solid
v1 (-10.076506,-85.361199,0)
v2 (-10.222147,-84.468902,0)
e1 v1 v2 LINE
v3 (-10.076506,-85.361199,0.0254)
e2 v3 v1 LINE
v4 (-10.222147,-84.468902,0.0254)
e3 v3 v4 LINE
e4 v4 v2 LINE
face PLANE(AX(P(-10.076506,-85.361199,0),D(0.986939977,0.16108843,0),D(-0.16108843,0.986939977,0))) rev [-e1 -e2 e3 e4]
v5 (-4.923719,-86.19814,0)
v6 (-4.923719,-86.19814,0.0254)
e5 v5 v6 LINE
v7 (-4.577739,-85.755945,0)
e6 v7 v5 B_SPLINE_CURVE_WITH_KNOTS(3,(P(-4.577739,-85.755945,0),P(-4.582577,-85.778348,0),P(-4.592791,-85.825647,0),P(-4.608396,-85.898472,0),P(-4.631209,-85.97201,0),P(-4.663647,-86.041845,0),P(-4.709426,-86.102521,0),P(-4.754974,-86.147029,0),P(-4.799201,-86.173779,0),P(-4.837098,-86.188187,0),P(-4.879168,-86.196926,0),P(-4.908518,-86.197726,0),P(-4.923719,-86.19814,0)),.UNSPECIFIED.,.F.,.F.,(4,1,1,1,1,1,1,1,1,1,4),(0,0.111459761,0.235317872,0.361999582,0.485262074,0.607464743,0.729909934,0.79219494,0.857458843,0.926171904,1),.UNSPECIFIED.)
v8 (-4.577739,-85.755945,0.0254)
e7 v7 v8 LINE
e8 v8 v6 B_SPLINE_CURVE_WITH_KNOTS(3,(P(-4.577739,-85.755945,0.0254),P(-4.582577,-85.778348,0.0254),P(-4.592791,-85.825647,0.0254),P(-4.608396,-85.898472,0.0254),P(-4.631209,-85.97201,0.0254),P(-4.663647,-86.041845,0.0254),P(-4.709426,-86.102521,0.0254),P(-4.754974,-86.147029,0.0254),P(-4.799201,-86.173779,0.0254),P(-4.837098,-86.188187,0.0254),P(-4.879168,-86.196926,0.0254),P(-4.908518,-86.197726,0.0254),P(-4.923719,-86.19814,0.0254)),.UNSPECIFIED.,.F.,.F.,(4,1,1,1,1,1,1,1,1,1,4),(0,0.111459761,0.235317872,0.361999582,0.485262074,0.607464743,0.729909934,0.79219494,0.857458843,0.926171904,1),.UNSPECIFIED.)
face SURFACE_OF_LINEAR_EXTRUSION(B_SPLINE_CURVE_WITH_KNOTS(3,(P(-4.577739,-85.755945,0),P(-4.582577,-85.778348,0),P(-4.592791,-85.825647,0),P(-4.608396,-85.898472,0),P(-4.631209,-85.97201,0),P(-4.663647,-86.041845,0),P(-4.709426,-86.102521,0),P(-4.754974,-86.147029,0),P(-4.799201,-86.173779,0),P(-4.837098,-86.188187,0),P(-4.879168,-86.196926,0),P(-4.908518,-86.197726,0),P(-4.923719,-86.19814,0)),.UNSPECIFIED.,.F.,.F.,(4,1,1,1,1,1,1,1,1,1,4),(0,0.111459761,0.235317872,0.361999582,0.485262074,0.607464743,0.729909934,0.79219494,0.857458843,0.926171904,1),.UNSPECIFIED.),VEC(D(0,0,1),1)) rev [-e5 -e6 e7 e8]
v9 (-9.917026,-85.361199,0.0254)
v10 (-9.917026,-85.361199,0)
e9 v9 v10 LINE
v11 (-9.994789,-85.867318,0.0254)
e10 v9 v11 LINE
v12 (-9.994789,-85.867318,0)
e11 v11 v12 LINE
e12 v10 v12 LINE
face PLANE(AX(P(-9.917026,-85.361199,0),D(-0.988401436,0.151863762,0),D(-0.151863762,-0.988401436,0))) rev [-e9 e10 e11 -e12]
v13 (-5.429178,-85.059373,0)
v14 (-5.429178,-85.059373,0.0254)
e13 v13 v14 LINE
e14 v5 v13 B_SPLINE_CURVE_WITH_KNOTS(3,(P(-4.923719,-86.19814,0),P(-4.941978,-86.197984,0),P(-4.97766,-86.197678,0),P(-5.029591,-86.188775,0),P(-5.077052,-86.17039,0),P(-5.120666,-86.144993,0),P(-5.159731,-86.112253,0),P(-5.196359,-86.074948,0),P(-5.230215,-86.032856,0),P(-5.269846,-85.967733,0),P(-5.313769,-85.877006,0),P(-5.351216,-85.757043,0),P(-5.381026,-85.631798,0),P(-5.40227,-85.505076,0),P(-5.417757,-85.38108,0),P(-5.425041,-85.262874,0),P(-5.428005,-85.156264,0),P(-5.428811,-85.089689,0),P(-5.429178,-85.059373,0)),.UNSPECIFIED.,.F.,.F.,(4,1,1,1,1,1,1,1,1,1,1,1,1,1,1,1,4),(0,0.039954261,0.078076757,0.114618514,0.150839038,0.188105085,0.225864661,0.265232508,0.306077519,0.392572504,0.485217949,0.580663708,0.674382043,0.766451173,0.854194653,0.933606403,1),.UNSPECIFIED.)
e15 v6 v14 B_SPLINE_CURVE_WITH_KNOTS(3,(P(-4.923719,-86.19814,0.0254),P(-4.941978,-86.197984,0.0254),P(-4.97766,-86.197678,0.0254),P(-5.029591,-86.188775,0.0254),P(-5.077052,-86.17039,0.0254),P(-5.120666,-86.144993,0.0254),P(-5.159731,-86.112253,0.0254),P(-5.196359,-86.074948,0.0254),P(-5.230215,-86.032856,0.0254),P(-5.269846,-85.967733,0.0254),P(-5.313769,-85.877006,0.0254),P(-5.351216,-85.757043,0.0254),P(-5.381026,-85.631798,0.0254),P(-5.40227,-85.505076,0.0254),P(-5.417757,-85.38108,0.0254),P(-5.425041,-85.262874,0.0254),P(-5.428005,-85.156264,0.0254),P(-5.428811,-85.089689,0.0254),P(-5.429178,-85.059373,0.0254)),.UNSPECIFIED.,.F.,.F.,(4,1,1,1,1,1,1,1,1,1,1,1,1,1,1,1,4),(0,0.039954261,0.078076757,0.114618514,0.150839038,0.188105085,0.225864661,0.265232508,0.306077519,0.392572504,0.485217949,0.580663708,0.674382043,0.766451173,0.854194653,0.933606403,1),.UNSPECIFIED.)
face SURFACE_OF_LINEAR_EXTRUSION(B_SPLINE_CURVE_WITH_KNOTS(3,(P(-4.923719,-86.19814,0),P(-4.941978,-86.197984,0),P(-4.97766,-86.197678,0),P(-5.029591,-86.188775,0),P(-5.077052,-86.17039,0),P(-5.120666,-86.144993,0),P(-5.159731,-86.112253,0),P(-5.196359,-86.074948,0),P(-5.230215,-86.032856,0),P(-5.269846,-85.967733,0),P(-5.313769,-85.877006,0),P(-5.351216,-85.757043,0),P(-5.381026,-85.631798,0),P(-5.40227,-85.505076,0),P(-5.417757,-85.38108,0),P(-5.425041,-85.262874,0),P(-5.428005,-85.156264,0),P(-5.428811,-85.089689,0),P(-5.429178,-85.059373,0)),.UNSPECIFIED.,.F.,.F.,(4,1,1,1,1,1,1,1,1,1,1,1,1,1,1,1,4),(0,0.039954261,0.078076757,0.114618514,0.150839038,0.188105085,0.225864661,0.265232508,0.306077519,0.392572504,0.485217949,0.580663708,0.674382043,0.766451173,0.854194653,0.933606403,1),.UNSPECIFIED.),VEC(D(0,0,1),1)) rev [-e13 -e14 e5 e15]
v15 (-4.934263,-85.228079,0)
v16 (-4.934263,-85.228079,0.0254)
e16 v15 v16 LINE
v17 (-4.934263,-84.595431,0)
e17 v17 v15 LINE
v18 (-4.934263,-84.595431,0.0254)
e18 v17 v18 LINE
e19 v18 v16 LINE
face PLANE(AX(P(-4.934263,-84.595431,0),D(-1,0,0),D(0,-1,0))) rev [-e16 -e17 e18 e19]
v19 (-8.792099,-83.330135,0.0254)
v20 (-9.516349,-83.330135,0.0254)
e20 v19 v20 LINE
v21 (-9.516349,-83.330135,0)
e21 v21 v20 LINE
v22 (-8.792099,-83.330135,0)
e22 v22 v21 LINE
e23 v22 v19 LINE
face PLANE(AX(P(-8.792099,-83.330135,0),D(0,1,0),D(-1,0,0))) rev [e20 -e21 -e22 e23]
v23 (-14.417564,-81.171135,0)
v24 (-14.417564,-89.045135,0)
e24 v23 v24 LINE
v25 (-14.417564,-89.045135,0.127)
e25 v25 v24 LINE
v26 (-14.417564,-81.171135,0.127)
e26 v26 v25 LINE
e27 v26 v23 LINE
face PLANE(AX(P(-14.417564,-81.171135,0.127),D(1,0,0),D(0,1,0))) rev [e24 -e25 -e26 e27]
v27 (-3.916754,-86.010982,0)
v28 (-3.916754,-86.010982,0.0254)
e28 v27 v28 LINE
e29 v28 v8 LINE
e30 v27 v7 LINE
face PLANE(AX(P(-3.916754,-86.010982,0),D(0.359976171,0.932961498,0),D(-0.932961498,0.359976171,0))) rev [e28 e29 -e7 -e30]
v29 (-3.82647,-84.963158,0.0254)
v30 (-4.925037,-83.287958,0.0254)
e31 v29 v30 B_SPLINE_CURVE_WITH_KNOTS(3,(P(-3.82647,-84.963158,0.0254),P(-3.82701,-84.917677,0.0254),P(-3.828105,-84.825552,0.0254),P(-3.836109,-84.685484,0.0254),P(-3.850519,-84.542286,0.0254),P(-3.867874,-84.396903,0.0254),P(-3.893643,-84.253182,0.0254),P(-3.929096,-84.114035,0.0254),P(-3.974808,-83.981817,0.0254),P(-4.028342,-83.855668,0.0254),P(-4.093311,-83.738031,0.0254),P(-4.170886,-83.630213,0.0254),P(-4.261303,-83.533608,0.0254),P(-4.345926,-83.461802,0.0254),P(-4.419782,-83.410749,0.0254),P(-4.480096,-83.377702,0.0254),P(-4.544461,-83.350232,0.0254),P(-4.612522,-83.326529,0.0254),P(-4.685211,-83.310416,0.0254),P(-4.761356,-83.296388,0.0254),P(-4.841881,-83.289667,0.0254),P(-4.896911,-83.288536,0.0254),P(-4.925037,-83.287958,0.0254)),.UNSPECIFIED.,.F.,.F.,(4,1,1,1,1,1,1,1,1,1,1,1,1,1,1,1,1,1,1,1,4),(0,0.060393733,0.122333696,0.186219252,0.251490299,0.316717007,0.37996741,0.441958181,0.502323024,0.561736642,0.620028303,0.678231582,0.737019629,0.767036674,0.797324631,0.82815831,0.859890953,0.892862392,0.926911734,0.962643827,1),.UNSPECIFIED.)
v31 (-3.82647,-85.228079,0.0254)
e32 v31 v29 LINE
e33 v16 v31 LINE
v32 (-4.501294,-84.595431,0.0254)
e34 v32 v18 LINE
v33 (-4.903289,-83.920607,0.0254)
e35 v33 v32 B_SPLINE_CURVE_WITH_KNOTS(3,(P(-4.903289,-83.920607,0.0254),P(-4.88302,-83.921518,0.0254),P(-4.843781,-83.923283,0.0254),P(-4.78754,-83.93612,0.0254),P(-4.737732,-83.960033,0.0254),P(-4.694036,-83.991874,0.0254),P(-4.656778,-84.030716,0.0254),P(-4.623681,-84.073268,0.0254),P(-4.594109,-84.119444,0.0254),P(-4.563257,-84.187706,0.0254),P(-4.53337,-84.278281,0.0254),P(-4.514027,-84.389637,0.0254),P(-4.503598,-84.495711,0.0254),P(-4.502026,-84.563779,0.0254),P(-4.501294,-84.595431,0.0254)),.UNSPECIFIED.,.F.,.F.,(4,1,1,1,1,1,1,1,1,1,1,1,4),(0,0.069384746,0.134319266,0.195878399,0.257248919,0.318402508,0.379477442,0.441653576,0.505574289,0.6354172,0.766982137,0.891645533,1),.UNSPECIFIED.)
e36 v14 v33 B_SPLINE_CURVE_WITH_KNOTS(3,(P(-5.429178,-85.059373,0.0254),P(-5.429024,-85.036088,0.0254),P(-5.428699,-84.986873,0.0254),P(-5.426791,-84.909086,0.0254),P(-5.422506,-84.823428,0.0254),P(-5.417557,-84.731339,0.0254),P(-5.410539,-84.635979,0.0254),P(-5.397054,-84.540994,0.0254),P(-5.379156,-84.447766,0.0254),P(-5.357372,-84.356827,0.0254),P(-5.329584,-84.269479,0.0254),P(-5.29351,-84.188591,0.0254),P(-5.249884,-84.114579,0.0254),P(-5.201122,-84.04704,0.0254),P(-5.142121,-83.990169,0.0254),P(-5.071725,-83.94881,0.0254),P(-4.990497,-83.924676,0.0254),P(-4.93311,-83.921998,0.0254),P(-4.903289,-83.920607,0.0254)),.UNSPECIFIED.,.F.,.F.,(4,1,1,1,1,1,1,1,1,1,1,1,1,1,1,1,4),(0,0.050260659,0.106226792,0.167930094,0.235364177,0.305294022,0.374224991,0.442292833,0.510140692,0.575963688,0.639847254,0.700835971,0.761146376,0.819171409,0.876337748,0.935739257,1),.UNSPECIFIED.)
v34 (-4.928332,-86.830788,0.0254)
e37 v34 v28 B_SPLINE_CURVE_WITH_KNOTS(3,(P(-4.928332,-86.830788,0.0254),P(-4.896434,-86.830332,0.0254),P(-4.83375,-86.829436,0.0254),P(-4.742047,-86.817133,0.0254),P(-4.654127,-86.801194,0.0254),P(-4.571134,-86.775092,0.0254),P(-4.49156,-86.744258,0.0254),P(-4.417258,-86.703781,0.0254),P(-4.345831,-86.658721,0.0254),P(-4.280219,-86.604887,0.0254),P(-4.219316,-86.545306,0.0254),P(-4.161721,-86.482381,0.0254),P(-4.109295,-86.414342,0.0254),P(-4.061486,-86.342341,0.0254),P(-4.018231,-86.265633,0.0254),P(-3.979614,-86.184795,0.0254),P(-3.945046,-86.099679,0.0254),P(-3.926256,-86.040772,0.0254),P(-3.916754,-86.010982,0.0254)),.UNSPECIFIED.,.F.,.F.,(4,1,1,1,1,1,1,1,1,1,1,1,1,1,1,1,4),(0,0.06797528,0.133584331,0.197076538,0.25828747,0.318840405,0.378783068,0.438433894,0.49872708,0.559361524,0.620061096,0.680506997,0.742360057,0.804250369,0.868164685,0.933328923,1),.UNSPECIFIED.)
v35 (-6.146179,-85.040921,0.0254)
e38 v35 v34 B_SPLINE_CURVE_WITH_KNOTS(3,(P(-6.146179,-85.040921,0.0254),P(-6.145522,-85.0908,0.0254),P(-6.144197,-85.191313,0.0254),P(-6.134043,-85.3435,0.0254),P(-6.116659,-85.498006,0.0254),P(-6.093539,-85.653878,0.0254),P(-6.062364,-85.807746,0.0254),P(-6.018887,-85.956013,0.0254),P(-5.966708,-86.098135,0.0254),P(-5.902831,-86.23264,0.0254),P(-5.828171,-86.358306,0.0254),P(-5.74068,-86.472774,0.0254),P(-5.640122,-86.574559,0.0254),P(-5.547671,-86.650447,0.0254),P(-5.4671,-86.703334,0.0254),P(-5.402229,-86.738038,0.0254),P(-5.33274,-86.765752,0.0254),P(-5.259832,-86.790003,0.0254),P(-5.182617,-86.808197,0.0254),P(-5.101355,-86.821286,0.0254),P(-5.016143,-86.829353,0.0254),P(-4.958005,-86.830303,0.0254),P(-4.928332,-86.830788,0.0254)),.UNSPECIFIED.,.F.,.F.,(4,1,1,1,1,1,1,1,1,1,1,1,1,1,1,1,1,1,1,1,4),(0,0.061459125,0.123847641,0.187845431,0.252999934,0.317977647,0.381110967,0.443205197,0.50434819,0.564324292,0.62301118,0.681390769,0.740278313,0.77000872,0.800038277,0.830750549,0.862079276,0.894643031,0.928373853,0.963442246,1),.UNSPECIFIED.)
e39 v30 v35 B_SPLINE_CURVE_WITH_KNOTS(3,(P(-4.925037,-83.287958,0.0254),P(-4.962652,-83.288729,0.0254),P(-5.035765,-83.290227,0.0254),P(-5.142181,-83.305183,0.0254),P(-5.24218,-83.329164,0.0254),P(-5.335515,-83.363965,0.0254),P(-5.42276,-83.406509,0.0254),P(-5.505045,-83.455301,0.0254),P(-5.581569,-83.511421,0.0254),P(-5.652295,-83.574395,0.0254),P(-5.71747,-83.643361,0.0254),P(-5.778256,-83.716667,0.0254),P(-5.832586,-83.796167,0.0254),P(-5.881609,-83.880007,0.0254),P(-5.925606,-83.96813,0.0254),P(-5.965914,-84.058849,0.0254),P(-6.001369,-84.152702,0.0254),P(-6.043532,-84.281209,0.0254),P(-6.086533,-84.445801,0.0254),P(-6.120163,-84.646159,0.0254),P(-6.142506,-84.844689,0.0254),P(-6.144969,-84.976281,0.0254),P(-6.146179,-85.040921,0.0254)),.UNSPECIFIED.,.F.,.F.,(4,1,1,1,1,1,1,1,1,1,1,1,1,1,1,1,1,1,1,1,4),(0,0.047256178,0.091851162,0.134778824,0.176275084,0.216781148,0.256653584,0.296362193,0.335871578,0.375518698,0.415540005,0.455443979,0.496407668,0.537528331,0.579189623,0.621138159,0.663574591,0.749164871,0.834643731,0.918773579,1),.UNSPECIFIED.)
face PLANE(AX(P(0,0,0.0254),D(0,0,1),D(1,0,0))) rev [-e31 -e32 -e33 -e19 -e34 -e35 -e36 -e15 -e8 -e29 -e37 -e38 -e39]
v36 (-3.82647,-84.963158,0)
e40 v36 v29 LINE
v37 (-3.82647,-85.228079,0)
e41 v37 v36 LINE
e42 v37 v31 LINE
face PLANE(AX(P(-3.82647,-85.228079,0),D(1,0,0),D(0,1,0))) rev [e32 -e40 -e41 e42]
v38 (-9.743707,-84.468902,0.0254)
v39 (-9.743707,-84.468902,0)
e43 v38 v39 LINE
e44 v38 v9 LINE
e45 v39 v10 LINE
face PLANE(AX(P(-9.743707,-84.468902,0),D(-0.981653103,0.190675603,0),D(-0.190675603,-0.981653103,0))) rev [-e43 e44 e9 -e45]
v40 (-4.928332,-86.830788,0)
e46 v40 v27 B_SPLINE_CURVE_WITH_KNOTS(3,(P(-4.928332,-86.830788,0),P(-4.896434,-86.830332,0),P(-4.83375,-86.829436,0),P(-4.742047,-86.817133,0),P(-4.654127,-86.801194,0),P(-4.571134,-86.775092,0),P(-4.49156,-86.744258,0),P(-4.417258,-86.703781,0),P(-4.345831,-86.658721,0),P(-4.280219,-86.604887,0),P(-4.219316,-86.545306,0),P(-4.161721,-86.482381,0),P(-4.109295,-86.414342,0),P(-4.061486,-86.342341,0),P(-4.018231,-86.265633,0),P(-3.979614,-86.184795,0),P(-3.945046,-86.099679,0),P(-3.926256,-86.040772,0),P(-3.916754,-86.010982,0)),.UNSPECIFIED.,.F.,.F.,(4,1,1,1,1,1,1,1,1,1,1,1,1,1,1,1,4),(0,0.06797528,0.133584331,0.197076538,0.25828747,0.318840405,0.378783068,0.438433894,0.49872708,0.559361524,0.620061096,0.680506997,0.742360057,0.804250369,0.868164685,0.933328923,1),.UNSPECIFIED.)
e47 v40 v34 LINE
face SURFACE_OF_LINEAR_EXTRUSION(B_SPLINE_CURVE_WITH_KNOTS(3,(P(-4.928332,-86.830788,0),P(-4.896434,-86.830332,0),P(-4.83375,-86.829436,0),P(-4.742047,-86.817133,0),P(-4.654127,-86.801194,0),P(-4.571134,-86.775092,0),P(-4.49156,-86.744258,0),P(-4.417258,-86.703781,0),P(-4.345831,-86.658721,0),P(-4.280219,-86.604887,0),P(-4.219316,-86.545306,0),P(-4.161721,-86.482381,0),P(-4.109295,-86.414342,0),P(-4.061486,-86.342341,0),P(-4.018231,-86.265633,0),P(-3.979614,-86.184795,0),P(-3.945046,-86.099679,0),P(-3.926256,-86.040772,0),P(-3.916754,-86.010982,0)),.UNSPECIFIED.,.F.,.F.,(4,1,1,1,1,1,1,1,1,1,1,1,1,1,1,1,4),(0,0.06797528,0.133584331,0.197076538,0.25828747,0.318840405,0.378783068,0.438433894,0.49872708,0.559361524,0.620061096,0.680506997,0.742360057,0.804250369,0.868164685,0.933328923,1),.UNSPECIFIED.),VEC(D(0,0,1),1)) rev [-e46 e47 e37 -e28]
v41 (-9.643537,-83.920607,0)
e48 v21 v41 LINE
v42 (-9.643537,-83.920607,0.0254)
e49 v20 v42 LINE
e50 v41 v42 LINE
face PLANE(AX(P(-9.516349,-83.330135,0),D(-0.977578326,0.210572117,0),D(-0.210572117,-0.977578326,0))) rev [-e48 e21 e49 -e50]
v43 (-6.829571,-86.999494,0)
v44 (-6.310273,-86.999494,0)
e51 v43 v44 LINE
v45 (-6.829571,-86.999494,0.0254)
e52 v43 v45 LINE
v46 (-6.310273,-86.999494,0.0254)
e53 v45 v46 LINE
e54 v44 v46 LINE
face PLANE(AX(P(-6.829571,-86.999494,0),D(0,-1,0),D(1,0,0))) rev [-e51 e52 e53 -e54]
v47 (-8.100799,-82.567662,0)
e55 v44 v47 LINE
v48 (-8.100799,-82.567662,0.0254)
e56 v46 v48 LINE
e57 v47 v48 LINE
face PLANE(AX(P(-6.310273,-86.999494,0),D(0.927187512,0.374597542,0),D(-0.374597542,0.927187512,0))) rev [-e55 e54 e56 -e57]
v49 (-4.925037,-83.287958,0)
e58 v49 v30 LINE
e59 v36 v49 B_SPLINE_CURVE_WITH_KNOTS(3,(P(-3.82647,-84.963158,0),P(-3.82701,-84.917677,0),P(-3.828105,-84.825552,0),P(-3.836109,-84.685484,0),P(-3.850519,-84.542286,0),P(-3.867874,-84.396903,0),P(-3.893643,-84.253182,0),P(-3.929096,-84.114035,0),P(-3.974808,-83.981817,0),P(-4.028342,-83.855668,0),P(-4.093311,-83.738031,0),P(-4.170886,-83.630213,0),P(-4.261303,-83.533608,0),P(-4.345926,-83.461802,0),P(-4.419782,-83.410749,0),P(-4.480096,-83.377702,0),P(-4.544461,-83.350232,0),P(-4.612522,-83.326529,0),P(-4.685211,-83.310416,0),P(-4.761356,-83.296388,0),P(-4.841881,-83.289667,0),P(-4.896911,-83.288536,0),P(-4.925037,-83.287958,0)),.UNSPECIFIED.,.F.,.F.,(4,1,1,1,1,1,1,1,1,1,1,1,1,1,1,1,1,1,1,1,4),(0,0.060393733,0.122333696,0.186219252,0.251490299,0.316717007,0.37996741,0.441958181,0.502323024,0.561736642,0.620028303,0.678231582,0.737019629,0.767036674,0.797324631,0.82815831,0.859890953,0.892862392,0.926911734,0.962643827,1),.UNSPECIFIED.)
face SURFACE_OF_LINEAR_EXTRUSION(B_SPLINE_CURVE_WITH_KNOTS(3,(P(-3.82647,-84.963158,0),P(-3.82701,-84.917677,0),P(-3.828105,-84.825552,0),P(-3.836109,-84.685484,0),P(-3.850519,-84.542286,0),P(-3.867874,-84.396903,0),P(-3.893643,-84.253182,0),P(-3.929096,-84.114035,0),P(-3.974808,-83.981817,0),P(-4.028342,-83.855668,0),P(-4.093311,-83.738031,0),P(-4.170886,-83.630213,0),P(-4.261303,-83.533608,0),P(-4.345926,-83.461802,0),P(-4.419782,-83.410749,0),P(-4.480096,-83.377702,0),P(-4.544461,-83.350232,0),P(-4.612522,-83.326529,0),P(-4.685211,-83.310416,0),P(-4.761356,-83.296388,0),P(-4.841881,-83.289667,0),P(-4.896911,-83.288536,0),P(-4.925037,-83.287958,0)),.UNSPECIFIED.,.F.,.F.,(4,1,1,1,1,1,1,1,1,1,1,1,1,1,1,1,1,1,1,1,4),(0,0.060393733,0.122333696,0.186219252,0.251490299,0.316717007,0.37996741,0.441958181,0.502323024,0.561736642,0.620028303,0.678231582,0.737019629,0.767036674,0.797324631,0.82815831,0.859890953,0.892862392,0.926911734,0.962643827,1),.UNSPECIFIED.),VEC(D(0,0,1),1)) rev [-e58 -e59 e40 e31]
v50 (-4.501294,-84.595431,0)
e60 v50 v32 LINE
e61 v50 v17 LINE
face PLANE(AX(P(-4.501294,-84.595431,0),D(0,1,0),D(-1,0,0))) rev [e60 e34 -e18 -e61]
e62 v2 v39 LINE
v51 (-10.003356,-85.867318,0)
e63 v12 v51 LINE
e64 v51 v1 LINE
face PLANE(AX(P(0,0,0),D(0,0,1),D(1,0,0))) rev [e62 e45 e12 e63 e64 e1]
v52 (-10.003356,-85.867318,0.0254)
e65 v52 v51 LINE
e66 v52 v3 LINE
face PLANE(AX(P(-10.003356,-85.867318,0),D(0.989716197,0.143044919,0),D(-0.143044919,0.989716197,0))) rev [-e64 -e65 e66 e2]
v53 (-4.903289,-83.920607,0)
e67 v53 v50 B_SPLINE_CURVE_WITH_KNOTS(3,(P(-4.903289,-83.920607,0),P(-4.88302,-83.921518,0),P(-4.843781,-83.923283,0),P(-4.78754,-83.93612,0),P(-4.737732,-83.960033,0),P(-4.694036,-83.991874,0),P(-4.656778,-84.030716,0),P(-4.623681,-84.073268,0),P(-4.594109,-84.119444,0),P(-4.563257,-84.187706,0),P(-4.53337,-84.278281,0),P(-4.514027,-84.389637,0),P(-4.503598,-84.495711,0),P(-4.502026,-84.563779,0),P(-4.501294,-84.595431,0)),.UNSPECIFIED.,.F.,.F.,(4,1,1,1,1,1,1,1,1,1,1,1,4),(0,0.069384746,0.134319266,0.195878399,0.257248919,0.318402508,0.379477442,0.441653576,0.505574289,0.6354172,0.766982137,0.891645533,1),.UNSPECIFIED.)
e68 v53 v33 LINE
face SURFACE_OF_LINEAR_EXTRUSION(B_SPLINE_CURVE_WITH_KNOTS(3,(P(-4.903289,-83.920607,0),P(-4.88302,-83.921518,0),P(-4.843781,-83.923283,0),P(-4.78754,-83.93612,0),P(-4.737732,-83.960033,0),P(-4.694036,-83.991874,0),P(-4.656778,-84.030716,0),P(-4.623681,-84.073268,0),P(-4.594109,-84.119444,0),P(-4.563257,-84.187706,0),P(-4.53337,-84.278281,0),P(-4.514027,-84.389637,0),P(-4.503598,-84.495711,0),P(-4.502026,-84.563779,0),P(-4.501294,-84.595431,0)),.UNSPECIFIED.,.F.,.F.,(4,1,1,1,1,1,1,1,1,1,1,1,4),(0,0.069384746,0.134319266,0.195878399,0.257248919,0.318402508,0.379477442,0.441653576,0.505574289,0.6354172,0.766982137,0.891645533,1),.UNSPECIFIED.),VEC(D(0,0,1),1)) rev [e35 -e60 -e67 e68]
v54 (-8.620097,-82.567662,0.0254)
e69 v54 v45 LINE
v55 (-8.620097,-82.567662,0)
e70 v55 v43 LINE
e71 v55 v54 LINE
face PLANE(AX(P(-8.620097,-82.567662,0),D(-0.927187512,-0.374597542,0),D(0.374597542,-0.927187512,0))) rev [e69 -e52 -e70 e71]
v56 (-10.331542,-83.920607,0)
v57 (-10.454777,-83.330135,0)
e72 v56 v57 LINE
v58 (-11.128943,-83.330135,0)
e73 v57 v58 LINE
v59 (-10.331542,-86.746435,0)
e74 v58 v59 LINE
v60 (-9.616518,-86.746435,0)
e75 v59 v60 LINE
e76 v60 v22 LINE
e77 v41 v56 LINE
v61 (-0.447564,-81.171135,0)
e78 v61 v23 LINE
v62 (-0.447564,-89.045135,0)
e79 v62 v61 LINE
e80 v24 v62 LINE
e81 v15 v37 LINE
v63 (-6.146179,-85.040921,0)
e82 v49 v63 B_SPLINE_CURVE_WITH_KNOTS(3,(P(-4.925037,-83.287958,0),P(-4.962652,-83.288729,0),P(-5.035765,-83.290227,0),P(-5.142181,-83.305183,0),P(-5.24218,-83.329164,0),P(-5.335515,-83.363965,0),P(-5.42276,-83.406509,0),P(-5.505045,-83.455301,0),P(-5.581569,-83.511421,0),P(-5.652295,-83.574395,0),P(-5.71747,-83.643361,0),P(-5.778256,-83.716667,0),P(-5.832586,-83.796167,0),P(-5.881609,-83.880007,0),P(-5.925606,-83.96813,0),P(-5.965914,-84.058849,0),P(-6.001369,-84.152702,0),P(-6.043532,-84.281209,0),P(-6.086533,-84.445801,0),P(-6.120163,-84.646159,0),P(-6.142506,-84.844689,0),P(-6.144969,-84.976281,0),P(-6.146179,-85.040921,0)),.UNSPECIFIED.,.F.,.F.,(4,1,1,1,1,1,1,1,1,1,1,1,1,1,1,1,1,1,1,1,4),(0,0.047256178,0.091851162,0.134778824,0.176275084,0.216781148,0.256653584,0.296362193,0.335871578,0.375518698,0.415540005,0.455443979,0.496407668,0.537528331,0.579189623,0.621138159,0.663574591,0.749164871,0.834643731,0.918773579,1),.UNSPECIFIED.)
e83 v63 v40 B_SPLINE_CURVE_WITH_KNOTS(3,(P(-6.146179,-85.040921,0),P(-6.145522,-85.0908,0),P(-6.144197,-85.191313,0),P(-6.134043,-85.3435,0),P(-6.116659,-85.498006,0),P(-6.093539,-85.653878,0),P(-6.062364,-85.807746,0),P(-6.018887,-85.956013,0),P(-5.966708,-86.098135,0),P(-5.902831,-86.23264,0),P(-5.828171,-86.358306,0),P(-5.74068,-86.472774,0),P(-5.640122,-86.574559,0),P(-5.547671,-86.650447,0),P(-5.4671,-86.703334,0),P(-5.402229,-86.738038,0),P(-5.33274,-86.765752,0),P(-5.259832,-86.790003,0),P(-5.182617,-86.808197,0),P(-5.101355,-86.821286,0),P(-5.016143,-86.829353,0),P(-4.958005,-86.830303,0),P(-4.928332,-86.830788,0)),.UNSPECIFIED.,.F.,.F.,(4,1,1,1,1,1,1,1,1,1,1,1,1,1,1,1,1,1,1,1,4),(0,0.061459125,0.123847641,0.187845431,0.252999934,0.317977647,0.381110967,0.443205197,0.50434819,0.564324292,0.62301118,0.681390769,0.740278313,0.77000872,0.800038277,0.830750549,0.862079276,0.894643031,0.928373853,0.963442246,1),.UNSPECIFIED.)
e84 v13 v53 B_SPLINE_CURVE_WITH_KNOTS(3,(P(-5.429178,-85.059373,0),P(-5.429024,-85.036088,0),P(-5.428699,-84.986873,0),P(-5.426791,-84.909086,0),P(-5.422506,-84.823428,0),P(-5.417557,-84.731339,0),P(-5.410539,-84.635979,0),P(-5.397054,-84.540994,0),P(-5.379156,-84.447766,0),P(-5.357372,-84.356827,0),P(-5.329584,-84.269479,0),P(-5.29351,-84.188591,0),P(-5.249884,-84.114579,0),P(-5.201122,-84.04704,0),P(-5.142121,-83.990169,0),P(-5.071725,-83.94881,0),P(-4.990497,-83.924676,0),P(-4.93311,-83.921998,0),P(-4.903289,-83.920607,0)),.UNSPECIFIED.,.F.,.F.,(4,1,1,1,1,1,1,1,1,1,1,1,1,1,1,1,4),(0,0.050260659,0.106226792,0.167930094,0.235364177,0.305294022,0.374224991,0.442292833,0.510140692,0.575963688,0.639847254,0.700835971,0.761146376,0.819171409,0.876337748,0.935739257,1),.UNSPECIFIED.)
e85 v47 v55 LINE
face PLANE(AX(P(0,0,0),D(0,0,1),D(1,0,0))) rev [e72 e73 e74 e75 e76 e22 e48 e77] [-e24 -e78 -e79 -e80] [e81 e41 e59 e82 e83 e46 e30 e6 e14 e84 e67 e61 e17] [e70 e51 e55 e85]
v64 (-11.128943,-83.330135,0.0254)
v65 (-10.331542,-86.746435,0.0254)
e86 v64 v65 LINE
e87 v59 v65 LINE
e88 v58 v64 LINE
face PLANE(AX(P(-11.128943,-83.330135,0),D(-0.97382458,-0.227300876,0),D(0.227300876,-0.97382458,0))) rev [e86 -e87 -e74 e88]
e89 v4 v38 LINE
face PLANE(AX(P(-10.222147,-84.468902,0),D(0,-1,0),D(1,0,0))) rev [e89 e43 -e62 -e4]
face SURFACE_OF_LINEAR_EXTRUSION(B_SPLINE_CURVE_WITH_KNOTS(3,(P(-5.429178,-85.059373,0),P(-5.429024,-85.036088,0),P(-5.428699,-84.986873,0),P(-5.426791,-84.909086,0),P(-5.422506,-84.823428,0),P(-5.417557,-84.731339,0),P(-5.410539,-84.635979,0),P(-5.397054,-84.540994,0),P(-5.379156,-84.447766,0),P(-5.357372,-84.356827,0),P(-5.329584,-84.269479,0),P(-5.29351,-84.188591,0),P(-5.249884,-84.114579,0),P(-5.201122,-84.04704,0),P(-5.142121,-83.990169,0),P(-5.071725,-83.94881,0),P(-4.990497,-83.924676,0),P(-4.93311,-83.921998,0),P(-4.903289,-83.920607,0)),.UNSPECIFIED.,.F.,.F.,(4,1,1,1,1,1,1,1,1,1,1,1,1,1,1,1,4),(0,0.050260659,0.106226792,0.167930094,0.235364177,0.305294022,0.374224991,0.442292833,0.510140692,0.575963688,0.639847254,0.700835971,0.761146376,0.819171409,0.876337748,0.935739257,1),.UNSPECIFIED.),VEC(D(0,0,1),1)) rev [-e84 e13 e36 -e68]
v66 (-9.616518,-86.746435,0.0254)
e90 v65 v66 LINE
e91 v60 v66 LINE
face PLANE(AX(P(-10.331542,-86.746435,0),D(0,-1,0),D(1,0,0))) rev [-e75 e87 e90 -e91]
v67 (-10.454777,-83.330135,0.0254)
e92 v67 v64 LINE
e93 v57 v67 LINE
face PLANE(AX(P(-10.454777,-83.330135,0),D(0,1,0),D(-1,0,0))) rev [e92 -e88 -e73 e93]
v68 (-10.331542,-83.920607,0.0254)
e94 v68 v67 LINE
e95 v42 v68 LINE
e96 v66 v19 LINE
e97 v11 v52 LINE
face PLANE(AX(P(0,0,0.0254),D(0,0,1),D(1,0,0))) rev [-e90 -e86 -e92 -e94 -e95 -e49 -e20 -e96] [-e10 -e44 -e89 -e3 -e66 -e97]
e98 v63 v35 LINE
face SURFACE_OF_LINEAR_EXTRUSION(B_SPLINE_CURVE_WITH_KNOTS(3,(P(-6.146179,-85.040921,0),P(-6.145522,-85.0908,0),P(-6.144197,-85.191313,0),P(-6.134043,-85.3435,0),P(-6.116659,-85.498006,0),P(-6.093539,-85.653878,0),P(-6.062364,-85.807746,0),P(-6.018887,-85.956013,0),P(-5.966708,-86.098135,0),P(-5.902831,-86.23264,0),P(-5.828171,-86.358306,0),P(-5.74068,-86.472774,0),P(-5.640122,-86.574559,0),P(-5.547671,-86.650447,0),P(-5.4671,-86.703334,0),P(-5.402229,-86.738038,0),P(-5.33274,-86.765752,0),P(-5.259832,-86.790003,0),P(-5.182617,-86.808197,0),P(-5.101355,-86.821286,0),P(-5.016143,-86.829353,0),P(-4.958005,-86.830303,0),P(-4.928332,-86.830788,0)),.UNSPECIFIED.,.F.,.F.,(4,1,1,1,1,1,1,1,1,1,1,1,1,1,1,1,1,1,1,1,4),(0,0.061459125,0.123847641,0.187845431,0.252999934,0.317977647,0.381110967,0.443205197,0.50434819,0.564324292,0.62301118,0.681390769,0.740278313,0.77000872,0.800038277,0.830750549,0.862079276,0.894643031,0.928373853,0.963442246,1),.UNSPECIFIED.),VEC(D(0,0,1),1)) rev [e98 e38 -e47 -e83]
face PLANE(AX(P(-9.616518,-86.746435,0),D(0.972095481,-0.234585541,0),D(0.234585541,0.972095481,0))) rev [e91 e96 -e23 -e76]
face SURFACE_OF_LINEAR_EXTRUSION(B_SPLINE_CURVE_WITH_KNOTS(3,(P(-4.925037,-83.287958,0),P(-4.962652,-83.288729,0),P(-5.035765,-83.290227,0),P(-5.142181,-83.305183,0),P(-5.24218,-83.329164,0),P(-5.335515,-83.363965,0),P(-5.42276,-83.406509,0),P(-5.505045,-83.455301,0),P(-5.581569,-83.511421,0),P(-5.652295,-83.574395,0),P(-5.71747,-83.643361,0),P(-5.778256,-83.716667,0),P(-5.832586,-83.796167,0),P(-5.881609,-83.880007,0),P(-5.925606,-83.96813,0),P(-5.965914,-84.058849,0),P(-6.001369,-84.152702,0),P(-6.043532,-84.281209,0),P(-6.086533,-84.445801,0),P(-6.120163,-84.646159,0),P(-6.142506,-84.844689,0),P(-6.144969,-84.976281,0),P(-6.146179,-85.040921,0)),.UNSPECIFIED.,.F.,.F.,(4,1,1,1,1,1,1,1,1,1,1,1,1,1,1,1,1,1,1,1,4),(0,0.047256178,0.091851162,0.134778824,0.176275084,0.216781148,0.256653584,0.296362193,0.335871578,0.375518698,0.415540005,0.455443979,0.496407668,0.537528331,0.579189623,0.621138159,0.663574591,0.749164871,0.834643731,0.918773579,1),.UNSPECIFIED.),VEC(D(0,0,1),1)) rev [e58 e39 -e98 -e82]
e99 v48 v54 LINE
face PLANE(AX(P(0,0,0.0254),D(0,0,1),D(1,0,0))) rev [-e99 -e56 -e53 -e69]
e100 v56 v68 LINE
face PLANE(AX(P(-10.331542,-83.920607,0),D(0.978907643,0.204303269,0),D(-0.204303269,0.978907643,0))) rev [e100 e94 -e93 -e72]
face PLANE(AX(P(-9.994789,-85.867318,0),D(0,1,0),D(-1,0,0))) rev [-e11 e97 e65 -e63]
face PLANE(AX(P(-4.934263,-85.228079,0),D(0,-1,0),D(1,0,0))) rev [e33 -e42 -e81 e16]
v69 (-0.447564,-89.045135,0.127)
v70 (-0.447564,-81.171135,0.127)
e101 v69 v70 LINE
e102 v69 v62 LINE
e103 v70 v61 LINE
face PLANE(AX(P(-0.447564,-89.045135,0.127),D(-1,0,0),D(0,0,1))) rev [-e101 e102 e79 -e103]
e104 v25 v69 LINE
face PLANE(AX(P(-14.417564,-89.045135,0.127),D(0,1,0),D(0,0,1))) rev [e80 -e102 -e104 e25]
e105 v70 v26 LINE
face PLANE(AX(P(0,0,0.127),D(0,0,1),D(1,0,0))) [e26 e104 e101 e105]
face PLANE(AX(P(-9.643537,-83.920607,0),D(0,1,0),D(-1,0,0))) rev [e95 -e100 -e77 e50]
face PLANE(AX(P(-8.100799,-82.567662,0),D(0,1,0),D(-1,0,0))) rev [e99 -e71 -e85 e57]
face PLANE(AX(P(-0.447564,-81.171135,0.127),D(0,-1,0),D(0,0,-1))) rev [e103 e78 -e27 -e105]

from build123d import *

# Parameters (mm, degrees)
SKETCH1_W           = 13.97
SKETCH1_H           = 7.874
BOSS_EXTRUDE1_DEPTH = 0.127
WRAP2_START         = -0.0254
WRAP2_DEPTH         = 0.0254


# Read off the part's stored shape, not the designer's step: Wrap2
with BuildPart() as part:
    # Sketch1 → Boss-Extrude1 (new body)
    with BuildSketch(Plane.XY):
        with Locations((-7.432564008, -85.108134992)):
            Rectangle(SKETCH1_W, SKETCH1_H)
    extrude(amount=BOSS_EXTRUDE1_DEPTH)

    # Wrap2 outline → Wrap2 (cut)
    # profile 1 of 3: a face of its own
    with BuildSketch(Plane(origin=(0, 0, 0), x_dir=(-1, 0, 0), z_dir=(0, 0, -1)).offset(WRAP2_START)):
        with BuildLine():
            add(Edge.make_bspline(
                [(3.826469564, -84.963158025), (3.827010027, -84.917677488), (3.828104792, -84.825552), (3.836108508, -84.685484109), (3.850519029, -84.542286335), (3.867873709, -84.396902881), (3.893643168, -84.253181502), (3.929096048, -84.114035219), (3.974808247, -83.981817181), (4.028342433, -83.855668459), (4.093310971, -83.738030743), (4.170886206, -83.63021293), (4.261303249, -83.533608273), (4.345926352, -83.46180179), (4.419782346, -83.410748531), (4.480095673, -83.377701727), (4.544461085, -83.350231984), (4.612521738, -83.326528765), (4.68521128, -83.310415652), (4.76135621, -83.29638795), (4.841881411, -83.289666964), (4.896910681, -83.288536329), (4.925036713, -83.287958449)],
                knots=[0, 0, 0, 0, 0.060393733, 0.122333696, 0.186219252, 0.251490299, 0.316717007, 0.37996741, 0.441958181, 0.502323024, 0.561736642, 0.620028303, 0.678231582, 0.737019629, 0.767036674, 0.797324631, 0.82815831, 0.859890953, 0.892862392, 0.926911734, 0.962643827, 1, 1, 1, 1], degree=3))
            Line((3.826469564, -84.963158025), (3.826469564, -85.228079437))
            Line((3.826469564, -85.228079437), (4.934262831, -85.228079437))
            Line((4.934262831, -85.228079437), (4.934262831, -84.595431289))
            Line((4.934262831, -84.595431289), (4.501294255, -84.595431289))
            add(Edge.make_bspline(
                [(4.903289433, -83.920606597), (4.883020015, -83.921518297), (4.843781227, -83.923283222), (4.787539956, -83.936120227), (4.737731616, -83.960032853), (4.694035563, -83.991873703), (4.65677765, -84.030716275), (4.623681087, -84.073267778), (4.594108521, -84.119444237), (4.563257184, -84.187706346), (4.533369818, -84.278281117), (4.51402702, -84.389637441), (4.503598137, -84.495710962), (4.502025527, -84.563779213), (4.501294255, -84.595431289)],
                knots=[0, 0, 0, 0, 0.069384746, 0.134319266, 0.195878399, 0.257248919, 0.318402508, 0.379477442, 0.441653576, 0.505574289, 0.6354172, 0.766982137, 0.891645533, 1, 1, 1, 1], degree=3))
            add(Edge.make_bspline(
                [(5.429178206, -85.059373264), (5.429024369, -85.03608762), (5.428699232, -84.986872999), (5.426790574, -84.909085734), (5.422505919, -84.823427687), (5.417557397, -84.731338954), (5.410538619, -84.635978716), (5.397054266, -84.540994333), (5.379156301, -84.447765598), (5.357372325, -84.356826658), (5.32958417, -84.26947942), (5.293509852, -84.188591179), (5.24988398, -84.114578629), (5.201121993, -84.047039536), (5.142120957, -83.990169438), (5.071724956, -83.948809925), (4.990496804, -83.9246758), (4.933110214, -83.921998071), (4.903289433, -83.920606597)],
                knots=[0, 0, 0, 0, 0.050260659, 0.106226792, 0.167930094, 0.235364177, 0.305294022, 0.374224991, 0.442292833, 0.510140692, 0.575963688, 0.639847254, 0.700835971, 0.761146376, 0.819171409, 0.876337748, 0.935739257, 1, 1, 1, 1], degree=3))
            add(Edge.make_bspline(
                [(4.923718696, -86.198139931), (4.941978047, -86.197983673), (4.977659622, -86.197678321), (5.029590573, -86.188774852), (5.077051545, -86.170390041), (5.120666255, -86.144993152), (5.159731256, -86.112253488), (5.196358978, -86.074948111), (5.230215367, -86.032855586), (5.269845718, -85.967732887), (5.313768574, -85.877005825), (5.351216379, -85.757043204), (5.381026394, -85.631798202), (5.402269582, -85.505075767), (5.417756569, -85.381079587), (5.425040742, -85.262874233), (5.428004678, -85.156264467), (5.428811028, -85.089688945), (5.429178206, -85.059373264)],
                knots=[0, 0, 0, 0, 0.039954261, 0.078076757, 0.114618514, 0.150839038, 0.188105085, 0.225864661, 0.265232508, 0.306077519, 0.392572504, 0.485217949, 0.580663708, 0.674382043, 0.766451173, 0.854194653, 0.933606403, 1, 1, 1, 1], degree=3))
            add(Edge.make_bspline(
                [(4.57773924, -85.755945235), (4.582577242, -85.778348376), (4.592791408, -85.825646697), (4.608395816, -85.89847248), (4.631209267, -85.972009886), (4.663647447, -86.041845309), (4.70942621, -86.102520974), (4.754973641, -86.147029353), (4.799200923, -86.173778979), (4.837098167, -86.188186847), (4.879168417, -86.196926256), (4.908517542, -86.197725809), (4.923718696, -86.198139931)],
                knots=[0, 0, 0, 0, 0.111459761, 0.235317872, 0.361999582, 0.485262074, 0.607464743, 0.729909934, 0.79219494, 0.857458843, 0.926171904, 1, 1, 1, 1], degree=3))
            Line((4.57773924, -85.755945235), (3.916753726, -86.01098152))
            add(Edge.make_bspline(
                [(4.928331755, -86.830788079), (4.896434292, -86.830332212), (4.833749721, -86.829436348), (4.742047146, -86.817132973), (4.654126811, -86.801194053), (4.571134339, -86.775092112), (4.491560198, -86.74425801), (4.417258458, -86.703781354), (4.345830532, -86.658720769), (4.280219139, -86.604886836), (4.219315678, -86.545306137), (4.161721217, -86.482381172), (4.109294678, -86.414342392), (4.061486444, -86.342341386), (4.018231492, -86.265633071), (3.979613777, -86.18479514), (3.945045633, -86.099679103), (3.926255949, -86.040771812), (3.916753726, -86.01098152)],
                knots=[0, 0, 0, 0, 0.06797528, 0.133584331, 0.197076538, 0.25828747, 0.318840405, 0.378783068, 0.438433894, 0.49872708, 0.559361524, 0.620061096, 0.680506997, 0.742360057, 0.804250369, 0.868164685, 0.933328923, 1, 1, 1, 1], degree=3))
            add(Edge.make_bspline(
                [(6.14617944, -85.040921026), (6.145521872, -85.090800393), (6.144196793, -85.191313407), (6.134042597, -85.34350023), (6.11665869, -85.498005886), (6.093538793, -85.653878197), (6.062363872, -85.807745753), (6.018887243, -85.956012754), (5.966707906, -86.098134931), (5.90283112, -86.232639552), (5.828171088, -86.358305611), (5.740679889, -86.472773753), (5.640121565, -86.574558841), (5.54767066, -86.650447491), (5.467099706, -86.703334293), (5.402229448, -86.738037504), (5.332739537, -86.765751972), (5.259832099, -86.790003038), (5.182616631, -86.808196765), (5.101355264, -86.821285924), (5.016142878, -86.829352977), (4.958005093, -86.830303126), (4.928331755, -86.830788079)],
                knots=[0, 0, 0, 0, 0.061459125, 0.123847641, 0.187845431, 0.252999934, 0.317977647, 0.381110967, 0.443205197, 0.50434819, 0.564324292, 0.62301118, 0.681390769, 0.740278313, 0.77000872, 0.800038277, 0.830750549, 0.862079276, 0.894643031, 0.928373853, 0.963442246, 1, 1, 1, 1], degree=3))
            add(Edge.make_bspline(
                [(4.925036713, -83.287958449), (4.962652324, -83.288728972), (5.035765254, -83.290226625), (5.142181401, -83.305182693), (5.242179768, -83.329163602), (5.335515369, -83.363965041), (5.422760168, -83.406508535), (5.505044685, -83.455300925), (5.581568633, -83.511420955), (5.652295495, -83.574395033), (5.717470366, -83.643361149), (5.778256244, -83.716667025), (5.832585948, -83.796167108), (5.881609023, -83.880006865), (5.92560631, -83.968130055), (5.96591433, -84.058848519), (6.001368692, -84.152702414), (6.043531579, -84.281209473), (6.08653268, -84.445801174), (6.120163208, -84.646159486), (6.142505611, -84.844689175), (6.14496925, -84.976280597), (6.14617944, -85.040921026)],
                knots=[0, 0, 0, 0, 0.047256178, 0.091851162, 0.134778824, 0.176275084, 0.216781148, 0.256653584, 0.296362193, 0.335871578, 0.375518698, 0.415540005, 0.455443979, 0.496407668, 0.537528331, 0.579189623, 0.621138159, 0.663574591, 0.749164871, 0.834643731, 0.918773579, 1, 1, 1, 1], degree=3))
        make_face()
    # profile 2 of 3: a face of its own
    with BuildSketch(Plane(origin=(0, 0, 0), x_dir=(-1, 0, 0), z_dir=(0, 0, -1)).offset(WRAP2_START)):
        Polygon((6.829571242, -86.999494252), (8.620097303, -82.567662172), (8.100798615, -82.567662172), (6.310272554, -86.999494252), align=None)
    # profile 3 of 3: a face of its own
    with BuildSketch(Plane(origin=(0, 0, 0), x_dir=(-1, 0, 0), z_dir=(0, 0, -1)).offset(WRAP2_START)):
        Polygon((9.643537484, -83.920606597), (9.516348846, -83.330134992), (8.792098518, -83.330134992), (9.616518136, -86.746434992), (10.331542345, -86.746434992), (11.128942615, -83.330134992), (10.454776933, -83.330134992), (10.331542345, -83.920606597), align=None)
        Polygon((10.076506061, -85.361199151), (10.003356118, -85.86731767), (9.994789008, -85.86731767), (9.917026007, -85.361199151), (9.743706774, -84.468901659), (10.222146936, -84.468901659), align=None, mode=Mode.SUBTRACT)
    extrude(amount=WRAP2_DEPTH, mode=Mode.SUBTRACT)


solid = part.part
